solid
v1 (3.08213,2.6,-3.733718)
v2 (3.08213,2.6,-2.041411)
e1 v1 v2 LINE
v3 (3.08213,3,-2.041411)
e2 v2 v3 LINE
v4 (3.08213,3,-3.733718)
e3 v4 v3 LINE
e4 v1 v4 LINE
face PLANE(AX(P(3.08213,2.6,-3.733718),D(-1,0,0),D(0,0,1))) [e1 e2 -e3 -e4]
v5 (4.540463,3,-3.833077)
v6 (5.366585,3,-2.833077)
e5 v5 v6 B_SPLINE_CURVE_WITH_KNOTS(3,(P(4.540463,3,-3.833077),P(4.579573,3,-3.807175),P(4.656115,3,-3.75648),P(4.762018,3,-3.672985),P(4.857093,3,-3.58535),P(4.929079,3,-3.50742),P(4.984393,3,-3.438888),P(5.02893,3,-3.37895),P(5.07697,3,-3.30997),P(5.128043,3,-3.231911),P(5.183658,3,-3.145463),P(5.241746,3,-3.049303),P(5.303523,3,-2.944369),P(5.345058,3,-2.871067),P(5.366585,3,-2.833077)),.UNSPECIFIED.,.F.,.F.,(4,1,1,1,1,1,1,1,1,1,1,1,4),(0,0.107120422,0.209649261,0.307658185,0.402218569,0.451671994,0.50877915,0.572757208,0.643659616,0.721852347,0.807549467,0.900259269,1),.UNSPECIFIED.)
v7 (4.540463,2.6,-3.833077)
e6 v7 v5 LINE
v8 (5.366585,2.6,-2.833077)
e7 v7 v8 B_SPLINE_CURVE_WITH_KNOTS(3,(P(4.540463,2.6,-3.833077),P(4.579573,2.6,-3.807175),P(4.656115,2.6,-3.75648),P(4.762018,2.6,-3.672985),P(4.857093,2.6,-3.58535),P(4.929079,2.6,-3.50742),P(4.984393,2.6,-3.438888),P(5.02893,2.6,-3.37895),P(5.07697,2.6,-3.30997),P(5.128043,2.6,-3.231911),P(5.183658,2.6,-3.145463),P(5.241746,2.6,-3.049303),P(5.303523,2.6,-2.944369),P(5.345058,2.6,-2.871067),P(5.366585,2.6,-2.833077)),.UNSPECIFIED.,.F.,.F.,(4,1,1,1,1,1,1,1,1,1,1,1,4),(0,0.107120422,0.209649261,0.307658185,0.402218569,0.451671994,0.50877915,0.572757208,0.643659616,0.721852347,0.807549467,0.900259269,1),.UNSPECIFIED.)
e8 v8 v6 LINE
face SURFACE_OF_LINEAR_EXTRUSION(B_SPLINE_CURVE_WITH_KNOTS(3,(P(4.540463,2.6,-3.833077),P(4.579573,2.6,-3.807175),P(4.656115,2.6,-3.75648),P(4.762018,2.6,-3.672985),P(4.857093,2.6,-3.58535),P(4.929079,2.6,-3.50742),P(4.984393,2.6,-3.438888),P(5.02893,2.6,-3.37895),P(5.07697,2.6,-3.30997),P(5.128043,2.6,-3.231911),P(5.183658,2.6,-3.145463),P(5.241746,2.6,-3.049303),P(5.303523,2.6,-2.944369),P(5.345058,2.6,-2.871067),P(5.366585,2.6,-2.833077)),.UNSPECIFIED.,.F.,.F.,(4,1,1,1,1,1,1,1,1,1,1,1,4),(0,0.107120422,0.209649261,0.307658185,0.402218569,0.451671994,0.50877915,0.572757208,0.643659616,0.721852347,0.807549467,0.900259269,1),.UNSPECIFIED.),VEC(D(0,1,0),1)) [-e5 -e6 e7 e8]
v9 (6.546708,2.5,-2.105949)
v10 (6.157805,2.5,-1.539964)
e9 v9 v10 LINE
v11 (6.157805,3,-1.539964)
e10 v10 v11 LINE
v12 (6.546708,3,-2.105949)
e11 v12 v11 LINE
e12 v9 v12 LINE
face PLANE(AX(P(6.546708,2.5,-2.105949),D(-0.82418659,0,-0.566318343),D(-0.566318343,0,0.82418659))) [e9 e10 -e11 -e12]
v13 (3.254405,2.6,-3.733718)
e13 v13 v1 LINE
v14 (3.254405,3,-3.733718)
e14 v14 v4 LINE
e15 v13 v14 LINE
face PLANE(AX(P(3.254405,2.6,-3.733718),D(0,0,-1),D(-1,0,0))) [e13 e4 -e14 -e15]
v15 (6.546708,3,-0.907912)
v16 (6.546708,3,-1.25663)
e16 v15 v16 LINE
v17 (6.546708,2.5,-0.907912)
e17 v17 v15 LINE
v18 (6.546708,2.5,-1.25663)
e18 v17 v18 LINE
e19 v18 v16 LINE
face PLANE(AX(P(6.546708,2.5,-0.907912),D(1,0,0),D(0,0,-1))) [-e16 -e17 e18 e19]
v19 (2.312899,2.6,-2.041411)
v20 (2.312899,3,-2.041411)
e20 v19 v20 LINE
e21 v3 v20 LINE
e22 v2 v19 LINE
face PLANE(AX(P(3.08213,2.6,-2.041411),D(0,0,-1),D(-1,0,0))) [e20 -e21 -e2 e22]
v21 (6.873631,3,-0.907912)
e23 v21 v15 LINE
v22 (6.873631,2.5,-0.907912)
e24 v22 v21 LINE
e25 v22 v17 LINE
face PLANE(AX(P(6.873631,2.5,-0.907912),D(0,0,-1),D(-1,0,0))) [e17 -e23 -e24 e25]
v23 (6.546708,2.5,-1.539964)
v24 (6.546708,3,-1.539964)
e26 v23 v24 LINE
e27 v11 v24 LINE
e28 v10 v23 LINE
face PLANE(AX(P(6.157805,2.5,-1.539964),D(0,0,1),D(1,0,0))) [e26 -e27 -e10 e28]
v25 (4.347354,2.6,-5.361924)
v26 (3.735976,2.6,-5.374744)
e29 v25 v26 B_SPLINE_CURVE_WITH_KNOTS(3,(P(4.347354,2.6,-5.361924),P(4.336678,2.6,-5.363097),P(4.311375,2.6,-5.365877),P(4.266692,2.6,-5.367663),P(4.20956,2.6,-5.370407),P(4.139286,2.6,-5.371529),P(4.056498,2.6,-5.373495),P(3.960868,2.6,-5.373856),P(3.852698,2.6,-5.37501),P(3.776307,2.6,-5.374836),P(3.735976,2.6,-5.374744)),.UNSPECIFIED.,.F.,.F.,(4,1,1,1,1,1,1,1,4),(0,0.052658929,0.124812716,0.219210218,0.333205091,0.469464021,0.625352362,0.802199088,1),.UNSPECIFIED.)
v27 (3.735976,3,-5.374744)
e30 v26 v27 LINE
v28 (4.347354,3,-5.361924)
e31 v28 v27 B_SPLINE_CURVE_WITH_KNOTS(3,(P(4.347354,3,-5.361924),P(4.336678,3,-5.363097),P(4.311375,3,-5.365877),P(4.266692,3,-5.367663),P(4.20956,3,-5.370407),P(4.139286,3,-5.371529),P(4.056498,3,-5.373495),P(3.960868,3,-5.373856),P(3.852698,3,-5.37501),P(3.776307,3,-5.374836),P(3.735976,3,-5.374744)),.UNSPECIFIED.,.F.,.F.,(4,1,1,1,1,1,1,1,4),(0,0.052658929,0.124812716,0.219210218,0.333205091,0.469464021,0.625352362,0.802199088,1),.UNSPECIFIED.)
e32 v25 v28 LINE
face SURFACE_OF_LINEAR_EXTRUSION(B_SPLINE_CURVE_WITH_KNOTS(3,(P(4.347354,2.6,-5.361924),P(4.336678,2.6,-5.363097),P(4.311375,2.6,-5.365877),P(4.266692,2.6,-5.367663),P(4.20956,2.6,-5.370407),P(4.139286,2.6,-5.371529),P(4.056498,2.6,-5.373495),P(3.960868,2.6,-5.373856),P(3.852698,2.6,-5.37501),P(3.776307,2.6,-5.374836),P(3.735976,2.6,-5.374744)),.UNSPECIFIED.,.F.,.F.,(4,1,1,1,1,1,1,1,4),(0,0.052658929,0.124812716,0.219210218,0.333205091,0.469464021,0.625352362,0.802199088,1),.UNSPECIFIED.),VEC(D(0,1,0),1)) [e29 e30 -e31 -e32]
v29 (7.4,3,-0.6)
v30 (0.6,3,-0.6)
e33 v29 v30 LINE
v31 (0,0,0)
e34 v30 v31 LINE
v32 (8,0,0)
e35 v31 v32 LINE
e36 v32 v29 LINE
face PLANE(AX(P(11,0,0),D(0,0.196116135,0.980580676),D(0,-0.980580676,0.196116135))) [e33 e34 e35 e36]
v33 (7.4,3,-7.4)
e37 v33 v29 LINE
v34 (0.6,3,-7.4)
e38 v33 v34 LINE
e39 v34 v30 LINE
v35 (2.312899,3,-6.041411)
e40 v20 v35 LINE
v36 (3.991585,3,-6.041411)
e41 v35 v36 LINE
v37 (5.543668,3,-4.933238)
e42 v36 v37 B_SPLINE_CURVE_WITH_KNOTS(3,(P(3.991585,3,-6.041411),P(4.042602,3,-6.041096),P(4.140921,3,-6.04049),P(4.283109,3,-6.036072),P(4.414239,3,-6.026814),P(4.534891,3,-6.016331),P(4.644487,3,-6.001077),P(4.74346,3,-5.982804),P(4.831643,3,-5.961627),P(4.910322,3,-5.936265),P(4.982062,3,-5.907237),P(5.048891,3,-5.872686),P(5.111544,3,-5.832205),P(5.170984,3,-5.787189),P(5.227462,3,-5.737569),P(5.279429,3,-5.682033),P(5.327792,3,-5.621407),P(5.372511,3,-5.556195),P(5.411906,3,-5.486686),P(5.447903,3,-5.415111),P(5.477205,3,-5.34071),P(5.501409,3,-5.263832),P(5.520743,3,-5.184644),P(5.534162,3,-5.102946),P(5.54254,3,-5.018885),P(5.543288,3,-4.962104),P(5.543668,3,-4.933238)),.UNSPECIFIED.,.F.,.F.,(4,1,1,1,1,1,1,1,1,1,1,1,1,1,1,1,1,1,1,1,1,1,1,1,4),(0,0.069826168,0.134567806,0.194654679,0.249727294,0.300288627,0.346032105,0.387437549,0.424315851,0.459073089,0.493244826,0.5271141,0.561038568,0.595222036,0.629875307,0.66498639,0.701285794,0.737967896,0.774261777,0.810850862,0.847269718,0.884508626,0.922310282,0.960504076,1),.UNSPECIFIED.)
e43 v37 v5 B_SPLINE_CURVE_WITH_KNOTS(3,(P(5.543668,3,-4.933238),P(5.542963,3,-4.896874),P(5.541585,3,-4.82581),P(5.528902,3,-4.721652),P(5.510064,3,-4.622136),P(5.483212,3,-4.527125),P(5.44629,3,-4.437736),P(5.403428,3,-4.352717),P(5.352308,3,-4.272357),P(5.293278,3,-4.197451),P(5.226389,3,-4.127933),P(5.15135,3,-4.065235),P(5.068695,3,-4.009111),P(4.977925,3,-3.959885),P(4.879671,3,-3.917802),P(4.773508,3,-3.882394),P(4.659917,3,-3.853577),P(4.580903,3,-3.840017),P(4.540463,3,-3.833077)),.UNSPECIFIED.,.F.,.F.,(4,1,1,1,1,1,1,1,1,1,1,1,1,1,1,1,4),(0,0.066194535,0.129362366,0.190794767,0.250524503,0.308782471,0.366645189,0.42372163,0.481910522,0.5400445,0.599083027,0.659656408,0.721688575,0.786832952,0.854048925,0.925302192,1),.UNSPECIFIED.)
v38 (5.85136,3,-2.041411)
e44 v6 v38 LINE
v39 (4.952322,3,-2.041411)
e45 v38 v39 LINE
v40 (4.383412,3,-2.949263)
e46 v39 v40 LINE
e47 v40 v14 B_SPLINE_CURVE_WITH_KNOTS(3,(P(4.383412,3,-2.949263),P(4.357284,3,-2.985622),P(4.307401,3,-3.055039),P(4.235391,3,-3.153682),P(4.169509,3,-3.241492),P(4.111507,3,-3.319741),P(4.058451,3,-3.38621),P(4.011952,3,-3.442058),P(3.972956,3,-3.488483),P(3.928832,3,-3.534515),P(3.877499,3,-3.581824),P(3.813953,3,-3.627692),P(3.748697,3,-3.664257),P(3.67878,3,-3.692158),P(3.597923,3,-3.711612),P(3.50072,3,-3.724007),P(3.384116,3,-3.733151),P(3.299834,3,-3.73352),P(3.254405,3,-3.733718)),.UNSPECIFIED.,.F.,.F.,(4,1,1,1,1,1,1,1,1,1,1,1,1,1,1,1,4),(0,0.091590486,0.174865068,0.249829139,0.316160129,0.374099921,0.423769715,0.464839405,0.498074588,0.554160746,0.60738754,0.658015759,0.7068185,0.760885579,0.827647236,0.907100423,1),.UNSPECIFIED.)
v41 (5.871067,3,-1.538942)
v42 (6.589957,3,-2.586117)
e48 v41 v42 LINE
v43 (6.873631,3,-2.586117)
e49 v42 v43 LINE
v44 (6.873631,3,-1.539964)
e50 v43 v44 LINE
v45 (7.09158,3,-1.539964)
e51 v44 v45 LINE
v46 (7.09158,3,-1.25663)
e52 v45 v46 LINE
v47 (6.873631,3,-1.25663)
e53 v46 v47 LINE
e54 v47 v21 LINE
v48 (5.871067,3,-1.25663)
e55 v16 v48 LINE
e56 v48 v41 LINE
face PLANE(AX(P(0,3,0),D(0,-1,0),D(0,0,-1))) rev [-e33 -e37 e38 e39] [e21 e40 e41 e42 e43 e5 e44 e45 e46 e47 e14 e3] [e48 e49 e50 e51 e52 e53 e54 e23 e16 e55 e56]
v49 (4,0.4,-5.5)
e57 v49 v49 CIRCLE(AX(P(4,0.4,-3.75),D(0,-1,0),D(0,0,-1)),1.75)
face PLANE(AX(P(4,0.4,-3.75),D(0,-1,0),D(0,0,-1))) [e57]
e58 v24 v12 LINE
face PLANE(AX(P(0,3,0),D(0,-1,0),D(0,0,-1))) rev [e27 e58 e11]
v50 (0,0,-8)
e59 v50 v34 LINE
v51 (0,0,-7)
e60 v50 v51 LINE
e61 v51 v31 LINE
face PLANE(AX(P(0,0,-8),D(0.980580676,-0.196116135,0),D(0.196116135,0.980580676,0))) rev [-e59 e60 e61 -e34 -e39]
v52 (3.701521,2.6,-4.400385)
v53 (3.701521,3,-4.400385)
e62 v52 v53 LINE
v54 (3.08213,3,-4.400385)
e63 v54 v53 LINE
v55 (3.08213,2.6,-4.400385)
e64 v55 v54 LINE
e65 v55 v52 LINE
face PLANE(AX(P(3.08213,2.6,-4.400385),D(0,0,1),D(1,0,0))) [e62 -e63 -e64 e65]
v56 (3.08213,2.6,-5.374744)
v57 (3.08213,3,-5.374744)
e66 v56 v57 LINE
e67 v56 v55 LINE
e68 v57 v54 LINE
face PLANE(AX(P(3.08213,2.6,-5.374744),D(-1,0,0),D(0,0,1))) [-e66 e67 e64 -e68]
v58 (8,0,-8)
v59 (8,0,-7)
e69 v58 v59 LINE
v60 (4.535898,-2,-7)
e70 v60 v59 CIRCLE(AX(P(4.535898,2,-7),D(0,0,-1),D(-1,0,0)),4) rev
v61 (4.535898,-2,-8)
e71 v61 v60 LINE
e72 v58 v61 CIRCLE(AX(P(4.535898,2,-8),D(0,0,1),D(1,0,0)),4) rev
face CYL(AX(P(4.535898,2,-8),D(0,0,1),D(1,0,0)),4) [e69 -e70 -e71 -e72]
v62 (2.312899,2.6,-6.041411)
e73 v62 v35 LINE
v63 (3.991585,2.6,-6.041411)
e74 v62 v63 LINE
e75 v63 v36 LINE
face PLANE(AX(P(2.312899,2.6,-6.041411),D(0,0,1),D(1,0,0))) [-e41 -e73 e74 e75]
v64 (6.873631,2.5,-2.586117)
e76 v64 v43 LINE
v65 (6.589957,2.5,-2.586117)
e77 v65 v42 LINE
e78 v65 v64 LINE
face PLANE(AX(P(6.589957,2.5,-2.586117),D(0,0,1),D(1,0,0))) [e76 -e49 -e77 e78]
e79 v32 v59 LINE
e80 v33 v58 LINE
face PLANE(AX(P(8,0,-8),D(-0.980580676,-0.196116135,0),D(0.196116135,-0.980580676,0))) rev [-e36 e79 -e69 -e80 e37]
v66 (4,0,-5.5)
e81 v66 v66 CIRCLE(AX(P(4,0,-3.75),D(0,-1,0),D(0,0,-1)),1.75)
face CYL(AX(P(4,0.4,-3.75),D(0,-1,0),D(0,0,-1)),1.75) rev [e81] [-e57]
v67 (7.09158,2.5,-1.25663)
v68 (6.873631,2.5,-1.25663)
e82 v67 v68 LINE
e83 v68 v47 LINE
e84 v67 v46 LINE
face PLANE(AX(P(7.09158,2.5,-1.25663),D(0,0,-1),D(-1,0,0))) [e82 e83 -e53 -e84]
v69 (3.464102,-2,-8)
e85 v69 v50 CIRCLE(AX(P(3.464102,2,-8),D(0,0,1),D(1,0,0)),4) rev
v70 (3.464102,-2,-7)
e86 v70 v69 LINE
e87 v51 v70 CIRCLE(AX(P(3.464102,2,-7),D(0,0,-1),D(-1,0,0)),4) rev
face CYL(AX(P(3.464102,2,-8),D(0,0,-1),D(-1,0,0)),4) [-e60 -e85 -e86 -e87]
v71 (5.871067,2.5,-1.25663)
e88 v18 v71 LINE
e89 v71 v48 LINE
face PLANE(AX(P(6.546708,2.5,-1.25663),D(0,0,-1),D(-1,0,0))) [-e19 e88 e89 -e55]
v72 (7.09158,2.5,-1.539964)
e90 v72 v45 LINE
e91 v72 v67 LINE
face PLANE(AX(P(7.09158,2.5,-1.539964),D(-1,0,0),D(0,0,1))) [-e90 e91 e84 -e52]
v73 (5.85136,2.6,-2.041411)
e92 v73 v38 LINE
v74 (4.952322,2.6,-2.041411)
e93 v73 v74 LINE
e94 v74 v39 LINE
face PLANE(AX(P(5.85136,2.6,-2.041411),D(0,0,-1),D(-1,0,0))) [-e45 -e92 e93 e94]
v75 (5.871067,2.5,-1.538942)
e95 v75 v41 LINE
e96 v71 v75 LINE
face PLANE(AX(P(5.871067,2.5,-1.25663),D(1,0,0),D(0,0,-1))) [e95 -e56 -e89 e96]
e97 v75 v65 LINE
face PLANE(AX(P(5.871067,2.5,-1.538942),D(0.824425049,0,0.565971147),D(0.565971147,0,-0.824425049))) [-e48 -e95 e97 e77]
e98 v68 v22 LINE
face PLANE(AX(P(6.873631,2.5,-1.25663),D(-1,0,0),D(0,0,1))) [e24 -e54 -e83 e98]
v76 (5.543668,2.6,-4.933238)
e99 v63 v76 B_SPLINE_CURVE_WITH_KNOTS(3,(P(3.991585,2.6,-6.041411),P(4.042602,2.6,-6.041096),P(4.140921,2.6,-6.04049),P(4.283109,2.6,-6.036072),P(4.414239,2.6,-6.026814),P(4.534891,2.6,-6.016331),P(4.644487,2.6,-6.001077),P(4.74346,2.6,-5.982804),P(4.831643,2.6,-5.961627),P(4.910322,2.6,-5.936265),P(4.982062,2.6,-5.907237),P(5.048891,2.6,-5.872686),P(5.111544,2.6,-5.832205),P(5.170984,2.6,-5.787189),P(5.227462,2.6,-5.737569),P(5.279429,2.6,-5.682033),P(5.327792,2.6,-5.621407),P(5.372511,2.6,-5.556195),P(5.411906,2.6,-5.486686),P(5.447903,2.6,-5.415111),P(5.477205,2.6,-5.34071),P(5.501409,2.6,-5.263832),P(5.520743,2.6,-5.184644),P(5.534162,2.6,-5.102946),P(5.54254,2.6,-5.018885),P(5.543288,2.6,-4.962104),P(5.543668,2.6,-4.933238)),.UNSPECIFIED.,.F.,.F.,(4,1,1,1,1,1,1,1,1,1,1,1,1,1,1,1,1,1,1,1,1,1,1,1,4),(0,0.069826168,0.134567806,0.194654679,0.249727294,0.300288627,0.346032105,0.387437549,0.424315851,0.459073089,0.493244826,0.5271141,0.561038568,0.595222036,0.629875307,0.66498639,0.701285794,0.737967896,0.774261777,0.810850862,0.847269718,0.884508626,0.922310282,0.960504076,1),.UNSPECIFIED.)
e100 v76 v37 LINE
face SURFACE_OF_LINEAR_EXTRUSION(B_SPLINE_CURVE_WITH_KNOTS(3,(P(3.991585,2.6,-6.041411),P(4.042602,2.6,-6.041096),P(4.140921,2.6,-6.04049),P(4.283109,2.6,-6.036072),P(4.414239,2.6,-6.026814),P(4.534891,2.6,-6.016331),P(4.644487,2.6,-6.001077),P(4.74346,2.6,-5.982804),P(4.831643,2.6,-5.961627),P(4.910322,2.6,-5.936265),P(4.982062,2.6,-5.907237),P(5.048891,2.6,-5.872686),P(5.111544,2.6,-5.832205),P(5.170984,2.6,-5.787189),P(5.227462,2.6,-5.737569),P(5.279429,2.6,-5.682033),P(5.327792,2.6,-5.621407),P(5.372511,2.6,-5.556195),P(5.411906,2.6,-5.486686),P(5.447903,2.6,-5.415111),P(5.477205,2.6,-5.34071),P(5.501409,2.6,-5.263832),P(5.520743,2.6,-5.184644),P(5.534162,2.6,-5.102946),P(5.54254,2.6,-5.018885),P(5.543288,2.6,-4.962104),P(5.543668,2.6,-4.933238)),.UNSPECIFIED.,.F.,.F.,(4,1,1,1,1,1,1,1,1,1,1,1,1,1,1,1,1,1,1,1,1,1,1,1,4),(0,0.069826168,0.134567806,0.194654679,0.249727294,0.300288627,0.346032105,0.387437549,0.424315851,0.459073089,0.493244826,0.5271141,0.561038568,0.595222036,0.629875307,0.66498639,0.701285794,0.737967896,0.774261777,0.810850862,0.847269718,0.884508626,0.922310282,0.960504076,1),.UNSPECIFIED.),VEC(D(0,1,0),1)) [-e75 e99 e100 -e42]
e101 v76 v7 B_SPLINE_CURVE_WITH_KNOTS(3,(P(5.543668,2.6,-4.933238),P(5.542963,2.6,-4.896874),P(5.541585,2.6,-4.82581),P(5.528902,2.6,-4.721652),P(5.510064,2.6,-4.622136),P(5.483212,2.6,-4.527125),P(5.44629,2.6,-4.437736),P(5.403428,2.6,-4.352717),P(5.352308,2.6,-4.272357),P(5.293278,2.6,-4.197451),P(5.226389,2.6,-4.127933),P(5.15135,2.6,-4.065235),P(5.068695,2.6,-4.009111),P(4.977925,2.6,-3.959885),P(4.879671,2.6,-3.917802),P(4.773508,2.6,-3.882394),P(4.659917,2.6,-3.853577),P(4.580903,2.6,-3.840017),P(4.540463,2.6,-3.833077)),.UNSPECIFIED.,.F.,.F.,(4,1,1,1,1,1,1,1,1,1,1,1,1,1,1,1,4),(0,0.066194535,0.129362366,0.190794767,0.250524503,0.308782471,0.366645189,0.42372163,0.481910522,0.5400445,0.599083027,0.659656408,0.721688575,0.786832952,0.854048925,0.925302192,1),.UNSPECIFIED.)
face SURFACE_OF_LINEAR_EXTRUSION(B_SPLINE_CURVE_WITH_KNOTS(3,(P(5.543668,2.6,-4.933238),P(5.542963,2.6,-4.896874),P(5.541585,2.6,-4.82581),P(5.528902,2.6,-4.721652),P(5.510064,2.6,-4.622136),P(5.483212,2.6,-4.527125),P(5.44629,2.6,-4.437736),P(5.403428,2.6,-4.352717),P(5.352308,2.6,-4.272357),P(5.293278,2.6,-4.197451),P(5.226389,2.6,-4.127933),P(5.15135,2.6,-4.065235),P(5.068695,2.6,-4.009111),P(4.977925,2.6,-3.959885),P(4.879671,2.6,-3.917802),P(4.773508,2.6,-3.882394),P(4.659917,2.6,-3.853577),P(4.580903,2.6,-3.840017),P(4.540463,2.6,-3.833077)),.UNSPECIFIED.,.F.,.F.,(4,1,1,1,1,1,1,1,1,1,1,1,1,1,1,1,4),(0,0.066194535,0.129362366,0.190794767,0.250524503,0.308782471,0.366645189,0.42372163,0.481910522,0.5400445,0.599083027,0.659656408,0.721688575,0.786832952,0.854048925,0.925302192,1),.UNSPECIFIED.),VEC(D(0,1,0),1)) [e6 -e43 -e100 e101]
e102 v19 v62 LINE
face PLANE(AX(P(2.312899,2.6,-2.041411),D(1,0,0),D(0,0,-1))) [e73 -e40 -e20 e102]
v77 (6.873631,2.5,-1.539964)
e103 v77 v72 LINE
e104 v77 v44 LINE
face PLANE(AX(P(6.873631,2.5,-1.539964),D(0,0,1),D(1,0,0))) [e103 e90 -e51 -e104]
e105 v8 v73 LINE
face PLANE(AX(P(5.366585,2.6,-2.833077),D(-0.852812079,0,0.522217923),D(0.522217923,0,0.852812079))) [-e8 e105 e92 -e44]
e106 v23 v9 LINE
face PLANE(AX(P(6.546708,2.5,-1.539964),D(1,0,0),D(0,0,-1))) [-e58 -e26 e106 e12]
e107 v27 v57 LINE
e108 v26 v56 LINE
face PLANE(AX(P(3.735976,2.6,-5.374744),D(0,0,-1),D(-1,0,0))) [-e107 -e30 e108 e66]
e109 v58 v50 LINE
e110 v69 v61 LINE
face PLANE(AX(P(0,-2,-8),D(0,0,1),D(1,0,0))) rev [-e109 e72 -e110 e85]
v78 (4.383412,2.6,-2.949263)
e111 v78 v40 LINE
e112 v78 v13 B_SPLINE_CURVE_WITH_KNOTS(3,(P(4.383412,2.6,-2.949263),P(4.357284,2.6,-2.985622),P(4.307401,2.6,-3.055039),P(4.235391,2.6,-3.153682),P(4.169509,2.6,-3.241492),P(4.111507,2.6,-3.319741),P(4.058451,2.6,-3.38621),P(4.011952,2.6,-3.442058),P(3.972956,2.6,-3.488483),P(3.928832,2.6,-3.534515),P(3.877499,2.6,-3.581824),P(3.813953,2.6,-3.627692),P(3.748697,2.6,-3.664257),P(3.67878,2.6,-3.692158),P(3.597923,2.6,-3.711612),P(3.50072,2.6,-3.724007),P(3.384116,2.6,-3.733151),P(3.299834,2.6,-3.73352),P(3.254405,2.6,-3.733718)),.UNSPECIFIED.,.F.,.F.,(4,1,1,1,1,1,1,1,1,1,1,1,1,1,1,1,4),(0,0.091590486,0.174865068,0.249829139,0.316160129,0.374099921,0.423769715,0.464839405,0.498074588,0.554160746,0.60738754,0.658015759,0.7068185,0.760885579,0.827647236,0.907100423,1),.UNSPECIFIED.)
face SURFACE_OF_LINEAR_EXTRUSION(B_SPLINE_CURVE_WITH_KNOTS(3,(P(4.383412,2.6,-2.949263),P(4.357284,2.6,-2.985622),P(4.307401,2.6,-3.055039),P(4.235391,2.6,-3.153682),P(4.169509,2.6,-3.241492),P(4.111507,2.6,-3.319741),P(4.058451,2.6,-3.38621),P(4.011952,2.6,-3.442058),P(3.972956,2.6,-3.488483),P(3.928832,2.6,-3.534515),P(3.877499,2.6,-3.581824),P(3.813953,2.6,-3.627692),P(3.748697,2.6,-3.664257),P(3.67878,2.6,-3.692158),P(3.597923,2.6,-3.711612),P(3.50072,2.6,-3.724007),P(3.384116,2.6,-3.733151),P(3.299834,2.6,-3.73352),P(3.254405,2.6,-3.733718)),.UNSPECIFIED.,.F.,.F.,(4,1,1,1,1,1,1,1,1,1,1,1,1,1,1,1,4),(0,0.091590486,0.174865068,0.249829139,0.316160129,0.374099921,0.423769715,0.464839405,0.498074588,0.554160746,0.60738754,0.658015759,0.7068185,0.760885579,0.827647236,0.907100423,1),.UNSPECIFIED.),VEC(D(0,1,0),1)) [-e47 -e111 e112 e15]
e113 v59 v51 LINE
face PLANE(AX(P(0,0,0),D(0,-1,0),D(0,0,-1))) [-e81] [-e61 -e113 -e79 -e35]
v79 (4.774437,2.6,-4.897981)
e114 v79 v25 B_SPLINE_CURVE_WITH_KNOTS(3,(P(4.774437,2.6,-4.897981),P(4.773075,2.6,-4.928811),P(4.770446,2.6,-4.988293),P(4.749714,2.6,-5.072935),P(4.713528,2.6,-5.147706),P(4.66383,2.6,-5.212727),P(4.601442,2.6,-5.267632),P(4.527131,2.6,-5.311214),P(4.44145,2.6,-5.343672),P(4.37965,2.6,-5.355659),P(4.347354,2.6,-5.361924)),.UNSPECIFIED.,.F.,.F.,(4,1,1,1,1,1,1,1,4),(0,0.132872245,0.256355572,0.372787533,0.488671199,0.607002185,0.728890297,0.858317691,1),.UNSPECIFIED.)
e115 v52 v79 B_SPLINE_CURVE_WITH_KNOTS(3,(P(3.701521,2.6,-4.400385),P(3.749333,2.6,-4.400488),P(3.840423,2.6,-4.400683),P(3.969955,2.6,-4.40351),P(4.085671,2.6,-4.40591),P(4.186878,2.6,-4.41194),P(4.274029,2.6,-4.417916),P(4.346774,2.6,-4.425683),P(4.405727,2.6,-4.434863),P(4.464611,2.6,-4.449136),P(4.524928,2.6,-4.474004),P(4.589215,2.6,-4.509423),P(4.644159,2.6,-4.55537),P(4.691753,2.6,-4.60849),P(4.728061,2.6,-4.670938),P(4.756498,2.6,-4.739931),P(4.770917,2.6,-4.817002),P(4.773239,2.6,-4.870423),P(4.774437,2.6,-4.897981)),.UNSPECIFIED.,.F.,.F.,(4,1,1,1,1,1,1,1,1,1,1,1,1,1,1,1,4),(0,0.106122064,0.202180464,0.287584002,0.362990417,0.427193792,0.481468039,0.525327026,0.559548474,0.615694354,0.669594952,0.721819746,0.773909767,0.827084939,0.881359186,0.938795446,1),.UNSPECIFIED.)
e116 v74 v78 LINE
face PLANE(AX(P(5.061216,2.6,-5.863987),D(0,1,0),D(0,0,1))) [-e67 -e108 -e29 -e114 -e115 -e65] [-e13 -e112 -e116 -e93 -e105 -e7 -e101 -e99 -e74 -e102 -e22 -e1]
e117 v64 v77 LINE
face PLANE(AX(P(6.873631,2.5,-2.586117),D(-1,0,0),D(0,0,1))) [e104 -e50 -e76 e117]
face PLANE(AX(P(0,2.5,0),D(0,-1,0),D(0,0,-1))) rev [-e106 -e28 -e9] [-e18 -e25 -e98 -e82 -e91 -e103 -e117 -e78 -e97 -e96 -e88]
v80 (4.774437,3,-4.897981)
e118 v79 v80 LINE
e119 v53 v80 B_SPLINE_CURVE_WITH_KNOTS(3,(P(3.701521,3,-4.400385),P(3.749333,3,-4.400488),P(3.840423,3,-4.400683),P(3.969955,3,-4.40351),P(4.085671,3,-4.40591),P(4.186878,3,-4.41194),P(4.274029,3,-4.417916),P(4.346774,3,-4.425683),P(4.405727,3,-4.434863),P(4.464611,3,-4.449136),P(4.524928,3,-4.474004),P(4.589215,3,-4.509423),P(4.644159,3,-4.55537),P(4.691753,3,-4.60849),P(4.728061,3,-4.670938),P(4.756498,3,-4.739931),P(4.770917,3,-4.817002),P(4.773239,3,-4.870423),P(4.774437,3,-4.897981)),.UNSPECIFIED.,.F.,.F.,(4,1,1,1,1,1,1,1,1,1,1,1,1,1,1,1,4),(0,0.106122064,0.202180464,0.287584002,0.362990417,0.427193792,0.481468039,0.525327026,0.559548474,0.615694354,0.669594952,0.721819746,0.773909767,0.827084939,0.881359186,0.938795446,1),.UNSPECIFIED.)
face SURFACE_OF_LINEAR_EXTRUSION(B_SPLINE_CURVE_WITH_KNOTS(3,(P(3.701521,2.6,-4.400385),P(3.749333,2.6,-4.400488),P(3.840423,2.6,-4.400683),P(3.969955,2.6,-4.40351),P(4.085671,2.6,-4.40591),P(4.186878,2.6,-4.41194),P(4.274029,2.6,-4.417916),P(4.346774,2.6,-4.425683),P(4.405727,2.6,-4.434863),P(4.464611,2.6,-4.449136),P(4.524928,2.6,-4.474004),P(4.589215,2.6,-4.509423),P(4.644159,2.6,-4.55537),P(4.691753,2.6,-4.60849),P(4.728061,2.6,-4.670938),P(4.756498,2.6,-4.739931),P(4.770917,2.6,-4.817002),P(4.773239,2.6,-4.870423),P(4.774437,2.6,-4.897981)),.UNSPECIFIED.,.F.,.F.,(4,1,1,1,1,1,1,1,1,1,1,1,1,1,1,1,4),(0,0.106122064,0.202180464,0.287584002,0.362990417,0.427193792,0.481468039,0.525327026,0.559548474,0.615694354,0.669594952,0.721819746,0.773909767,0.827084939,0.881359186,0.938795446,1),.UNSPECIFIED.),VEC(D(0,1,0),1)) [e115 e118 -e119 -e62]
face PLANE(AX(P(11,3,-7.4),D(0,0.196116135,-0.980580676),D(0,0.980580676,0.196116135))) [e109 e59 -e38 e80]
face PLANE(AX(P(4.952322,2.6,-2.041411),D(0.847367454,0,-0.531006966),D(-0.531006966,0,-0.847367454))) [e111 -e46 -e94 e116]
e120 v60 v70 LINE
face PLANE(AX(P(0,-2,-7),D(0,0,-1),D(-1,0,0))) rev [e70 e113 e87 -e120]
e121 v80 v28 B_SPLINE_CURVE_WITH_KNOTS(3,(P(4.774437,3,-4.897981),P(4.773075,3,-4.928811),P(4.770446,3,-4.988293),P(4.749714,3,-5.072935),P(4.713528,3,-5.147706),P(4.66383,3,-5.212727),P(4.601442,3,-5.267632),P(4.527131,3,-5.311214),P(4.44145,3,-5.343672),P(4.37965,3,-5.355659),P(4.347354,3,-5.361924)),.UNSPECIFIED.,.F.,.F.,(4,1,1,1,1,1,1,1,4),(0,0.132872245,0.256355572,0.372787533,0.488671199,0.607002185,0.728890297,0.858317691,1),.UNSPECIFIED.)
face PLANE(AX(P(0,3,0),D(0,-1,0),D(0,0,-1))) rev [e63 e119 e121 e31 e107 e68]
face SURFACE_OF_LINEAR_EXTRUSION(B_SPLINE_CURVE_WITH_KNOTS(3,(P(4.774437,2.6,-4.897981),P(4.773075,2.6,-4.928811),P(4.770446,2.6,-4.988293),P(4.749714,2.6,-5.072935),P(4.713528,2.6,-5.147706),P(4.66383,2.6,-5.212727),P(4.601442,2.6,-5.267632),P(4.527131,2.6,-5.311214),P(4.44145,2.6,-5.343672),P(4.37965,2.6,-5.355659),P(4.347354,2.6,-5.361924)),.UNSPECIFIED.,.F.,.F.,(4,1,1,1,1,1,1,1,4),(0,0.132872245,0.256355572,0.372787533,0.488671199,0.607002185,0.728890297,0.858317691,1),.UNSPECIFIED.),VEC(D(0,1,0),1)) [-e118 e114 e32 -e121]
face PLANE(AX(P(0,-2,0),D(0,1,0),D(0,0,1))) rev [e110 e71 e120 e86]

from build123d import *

# Parameters (mm, degrees)
SKETCH1_W               = 8
SKETCH1_H               = 8
BOSS_EXTRUDE1_DEPTH     = 3
CUT_EXTRUDE1_DEPTH      = 12.704699911
CUT_EXTRUDE1_DEPTH_BACK = 12.704699911
CUT_EXTRUDE2_DEPTH      = 11
SKETCH4_R               = 1.75
CUT_EXTRUDE3_DEPTH      = 0.4
SKETCH5_W               = 8
SKETCH5_H               = 1
BOSS_EXTRUDE2_DEPTH     = 2
FILLET1_R               = 4
CUT_EXTRUDE4_DEPTH      = 0.4
CUT_EXTRUDE5_DEPTH      = 0.5


with BuildPart() as part:
    # Sketch1 → Boss-Extrude1 (new body)
    with BuildSketch(Plane(origin=(0, 0, 0), x_dir=(1, 0, 0), z_dir=(0, 1, 0))):
        with Locations((4, 4)):
            Rectangle(SKETCH1_W, SKETCH1_H)
    extrude(amount=BOSS_EXTRUDE1_DEPTH)

    # Sketch2 → Cut-Extrude1 (cut, two sides: drawn at the far end of the back side and taken through both)
    with BuildSketch(Plane.XY.offset(-CUT_EXTRUDE1_DEPTH_BACK)):
        Polygon((0, 0), (0.6, 3), (0, 3), align=None)
        Polygon((8, 0), (7.4, 3), (8, 3), align=None)
    extrude(amount=CUT_EXTRUDE1_DEPTH + CUT_EXTRUDE1_DEPTH_BACK, mode=Mode.SUBTRACT)

    # Sketch3 → Cut-Extrude2 (cut)
    with BuildSketch(Plane(origin=(0, 0, 0), x_dir=(0, 0, -1), z_dir=(1, 0, 0))):
        Polygon((0, 0), (0.6, 3), (0, 3), align=None)
        Polygon((8, 3), (7.4, 3), (8, 0), align=None)
    extrude(amount=CUT_EXTRUDE2_DEPTH, mode=Mode.SUBTRACT)

    # Sketch4 → Cut-Extrude3 (cut)
    with BuildSketch(Plane.XZ):
        with Locations(Location((4, -3.75, 0), (0, 0, 270))):
            Circle(SKETCH4_R)
    extrude(amount=-CUT_EXTRUDE3_DEPTH, mode=Mode.SUBTRACT)

    # Sketch5 → Boss-Extrude2 (add)
    with BuildSketch(Plane.XZ):
        with Locations((4, -7.5)):
            Rectangle(SKETCH5_W, SKETCH5_H)
    extrude(amount=BOSS_EXTRUDE2_DEPTH)

    # Fillet1
    # the kernel refuses this fillet: 4 mm, written as the material it takes off along each edge
    with BuildSketch(Plane(origin=(8, -2, -16.660254038), x_dir=(0, 1, 0), z_dir=(0, 0, 1)), Plane(origin=(0, -2, 1.660254038), x_dir=(0, 1, 0), z_dir=(0, 0, -1))) as fillet1_piece_1:
        with BuildLine():
            CenterArc((4, 3.464101615), FILLET1_R, 180, 60)
            Line((0, 3.464101615), (-0.08, 3.464101615))
            Line((-0.08, 3.464101615), (-0.08, 0))
            Line((-0.08, 0), (0, -0.08))
            ThreePointArc((0, -0.08), (1, -0.08), (1.96, -0.069282032))
            Line((1.96, -0.069282032), (2, 0))
        make_face()
    extrude(amount=18.320508076, mode=Mode.SUBTRACT)

    # Sketch6 → Cut-Extrude4 (cut)
    with BuildSketch(Plane(origin=(0, 3, 0), x_dir=(1, 0, 0), z_dir=(0, 1, 0))):
        with BuildLine():
            Line((2.312898911, 2.041410717), (2.312898911, 6.041410717))
            Line((2.312898911, 6.041410717), (3.991584808, 6.041410717))
            add(Edge.make_bspline(
                [(3.991584808, 6.041410717), (4.042601732, 6.041096301), (4.140920681, 6.040490364), (4.283109063, 6.036071747), (4.414238667, 6.026814487), (4.534891188, 6.016330564), (4.644487122, 6.001077132), (4.74345979, 5.982803671), (4.831642566, 5.961627249), (4.910322089, 5.936265049), (4.982061831, 5.90723713), (5.04889092, 5.87268574), (5.111544162, 5.83220454), (5.170983849, 5.787188805), (5.227461685, 5.737569368), (5.279429347, 5.682033053), (5.32779225, 5.621406813), (5.372511371, 5.556195062), (5.411906117, 5.48668575), (5.447902572, 5.415111184), (5.477205044, 5.340709703), (5.50140862, 5.263831792), (5.52074281, 5.184644366), (5.534162371, 5.102946099), (5.542540058, 5.018884869), (5.543287935, 4.962103945), (5.543668142, 4.93323764)],
                knots=[0, 0, 0, 0, 1.675828044, 3.229627355, 4.67171229, 5.993455049, 7.206927059, 8.304770529, 9.29850117, 10.183580433, 11.017754134, 11.837875825, 12.650738409, 13.464925643, 14.285328857, 15.117007378, 15.959673368, 16.830859064, 17.711229498, 18.58228265, 19.460420693, 20.334473227, 21.228207035, 22.135446768, 23.052097822, 24, 24, 24, 24], degree=3))
            add(Edge.make_bspline(
                [(5.543668142, 4.93323764), (5.542962916, 4.896874176), (5.541584712, 4.825809944), (5.528901745, 4.721651895), (5.5100643, 4.622136315), (5.483211668, 4.527125334), (5.446289845, 4.437736414), (5.403428122, 4.352717347), (5.352308317, 4.272356517), (5.293277733, 4.19745058), (5.226389218, 4.127933229), (5.151349641, 4.065235076), (5.06869476, 4.009111084), (4.977924564, 3.959884897), (4.879671091, 3.917801842), (4.77350828, 3.882394441), (4.659916733, 3.853576761), (4.580902516, 3.840017181), (4.540463013, 3.833077384)],
                knots=[0, 0, 0, 0, 1.05911256, 2.069797862, 3.05271628, 4.008392045, 4.940519534, 5.866323021, 6.779546087, 7.71056835, 8.640711998, 9.585328432, 10.554502533, 11.547017206, 12.589327225, 13.664782803, 14.804835066, 16, 16, 16, 16], degree=3))
            add(Edge.make_bspline(
                [(4.540463013, 3.833077384), (4.579572554, 3.807174767), (4.656115253, 3.756479818), (4.762017587, 3.672984601), (4.857092756, 3.585349912), (4.929078878, 3.507419696), (4.984392794, 3.438888442), (5.028929947, 3.378950347), (5.076970406, 3.309970293), (5.128042999, 3.231910907), (5.183657562, 3.145462828), (5.241745689, 3.049302835), (5.303522957, 2.944368887), (5.345058377, 2.871067212), (5.366584808, 2.833077384)],
                knots=[0, 0, 0, 0, 1.285445069, 2.515791127, 3.691898215, 4.826622834, 5.420063933, 6.105349801, 6.873086501, 7.723915395, 8.66222816, 9.690593598, 10.803111229, 12, 12, 12, 12], degree=3))
            Line((5.366584808, 2.833077384), (5.851360449, 2.041410717))
            Line((5.851360449, 2.041410717), (4.952321988, 2.041410717))
            Line((4.952321988, 2.041410717), (4.383411731, 2.949263281))
            add(Edge.make_bspline(
                [(4.383411731, 2.949263281), (4.357283981, 2.985622121), (4.307400733, 3.055038622), (4.235391184, 3.153681722), (4.169508837, 3.241491798), (4.111507042, 3.319740728), (4.058450932, 3.386209972), (4.011951502, 3.442057857), (3.972955886, 3.488482798), (3.928832249, 3.534515131), (3.877499082, 3.581823547), (3.813952721, 3.627691749), (3.748696505, 3.664257396), (3.678779681, 3.692157844), (3.597922987, 3.71161189), (3.500720436, 3.724006591), (3.384115753, 3.733151261), (3.299833928, 3.733519777), (3.254405321, 3.73371841)],
                knots=[0, 0, 0, 0, 1.465447777, 2.797841088, 3.997266218, 5.05856206, 5.985598736, 6.780315439, 7.437430484, 7.969193402, 8.866571936, 9.718200644, 10.52825214, 11.309096006, 12.174169268, 13.242355782, 14.513606761, 16, 16, 16, 16], degree=3))
            Line((3.254405321, 3.73371841), (3.08212968, 3.73371841))
            Line((3.08212968, 3.73371841), (3.08212968, 2.041410717))
            Line((3.08212968, 2.041410717), (2.312898911, 2.041410717))
        make_face()
        with BuildLine():
            Line((3.08212968, 4.400385076), (3.701520706, 4.400385076))
            add(Edge.make_bspline(
                [(3.701520706, 4.400385076), (3.749332843, 4.400487541), (3.840423044, 4.400682752), (3.969955122, 4.403510317), (4.085670885, 4.405910235), (4.186877859, 4.411940131), (4.274028855, 4.417916326), (4.346774263, 4.425683211), (4.405726987, 4.434863419), (4.464610849, 4.449136231), (4.52492793, 4.474003789), (4.589214527, 4.509422512), (4.644158691, 4.555370201), (4.691753027, 4.608490376), (4.728060837, 4.670937972), (4.756498441, 4.739930879), (4.770916908, 4.817002181), (4.773239296, 4.87042263), (4.774437372, 4.89798123)],
                knots=[0, 0, 0, 0, 1.697953026, 3.23488743, 4.60134403, 5.807846676, 6.835100678, 7.703488618, 8.405232423, 8.952775585, 9.851109663, 10.713519226, 11.549115941, 12.382556273, 13.233359028, 14.101746968, 15.020727134, 16, 16, 16, 16], degree=3))
            add(Edge.make_bspline(
                [(4.774437372, 4.89798123), (4.773074786, 4.928811222), (4.770445895, 4.98829272), (4.749714088, 5.072935459), (4.713527564, 5.147705664), (4.663829732, 5.212726785), (4.601441933, 5.267631557), (4.527131165, 5.311213996), (4.441449505, 5.343672387), (4.379650359, 5.355659208), (4.347354039, 5.361923538)],
                knots=[0, 0, 0, 0, 1.062977961, 2.050844577, 2.982300261, 3.90936959, 4.856017476, 5.831122378, 6.86654153, 8, 8, 8, 8], degree=3))
            add(Edge.make_bspline(
                [(4.347354039, 5.361923538), (4.336678458, 5.363096555), (4.311375089, 5.365876852), (4.266692338, 5.367662514), (4.20955971, 5.370407271), (4.139285669, 5.371528992), (4.056498042, 5.373495271), (3.960867626, 5.373856329), (3.852698247, 5.375009885), (3.776307493, 5.374835906), (3.735975834, 5.374744051)],
                knots=[0, 0, 0, 0, 0.42127143, 0.998501726, 1.753681744, 2.66564073, 3.755712164, 5.002818897, 6.417592707, 8, 8, 8, 8], degree=3))
            Line((3.735975834, 5.374744051), (3.08212968, 5.374744051))
            Line((3.08212968, 5.374744051), (3.08212968, 4.400385076))
        make_face(mode=Mode.SUBTRACT)
    extrude(amount=-CUT_EXTRUDE4_DEPTH, mode=Mode.SUBTRACT)

    # Sketch7 → Cut-Extrude5 (cut)
    with BuildSketch(Plane(origin=(0, 3, 0), x_dir=(1, 0, 0), z_dir=(0, 1, 0))):
        Polygon((6.546707708, 0.907912363), (6.546707708, 1.256630312), (5.871066683, 1.256630312), (5.871066683, 1.53894201), (6.589956907, 2.586117491), (6.873630785, 2.586117491), (6.873630785, 1.539963645), (7.091579503, 1.539963645), (7.091579503, 1.256630312), (6.873630785, 1.256630312), (6.873630785, 0.907912363), align=None)
        Polygon((6.546707708, 1.539963645), (6.546707708, 2.105949222), (6.157805465, 1.539963645), align=None, mode=Mode.SUBTRACT)
    extrude(amount=-CUT_EXTRUDE5_DEPTH, mode=Mode.SUBTRACT)


solid = part.part
